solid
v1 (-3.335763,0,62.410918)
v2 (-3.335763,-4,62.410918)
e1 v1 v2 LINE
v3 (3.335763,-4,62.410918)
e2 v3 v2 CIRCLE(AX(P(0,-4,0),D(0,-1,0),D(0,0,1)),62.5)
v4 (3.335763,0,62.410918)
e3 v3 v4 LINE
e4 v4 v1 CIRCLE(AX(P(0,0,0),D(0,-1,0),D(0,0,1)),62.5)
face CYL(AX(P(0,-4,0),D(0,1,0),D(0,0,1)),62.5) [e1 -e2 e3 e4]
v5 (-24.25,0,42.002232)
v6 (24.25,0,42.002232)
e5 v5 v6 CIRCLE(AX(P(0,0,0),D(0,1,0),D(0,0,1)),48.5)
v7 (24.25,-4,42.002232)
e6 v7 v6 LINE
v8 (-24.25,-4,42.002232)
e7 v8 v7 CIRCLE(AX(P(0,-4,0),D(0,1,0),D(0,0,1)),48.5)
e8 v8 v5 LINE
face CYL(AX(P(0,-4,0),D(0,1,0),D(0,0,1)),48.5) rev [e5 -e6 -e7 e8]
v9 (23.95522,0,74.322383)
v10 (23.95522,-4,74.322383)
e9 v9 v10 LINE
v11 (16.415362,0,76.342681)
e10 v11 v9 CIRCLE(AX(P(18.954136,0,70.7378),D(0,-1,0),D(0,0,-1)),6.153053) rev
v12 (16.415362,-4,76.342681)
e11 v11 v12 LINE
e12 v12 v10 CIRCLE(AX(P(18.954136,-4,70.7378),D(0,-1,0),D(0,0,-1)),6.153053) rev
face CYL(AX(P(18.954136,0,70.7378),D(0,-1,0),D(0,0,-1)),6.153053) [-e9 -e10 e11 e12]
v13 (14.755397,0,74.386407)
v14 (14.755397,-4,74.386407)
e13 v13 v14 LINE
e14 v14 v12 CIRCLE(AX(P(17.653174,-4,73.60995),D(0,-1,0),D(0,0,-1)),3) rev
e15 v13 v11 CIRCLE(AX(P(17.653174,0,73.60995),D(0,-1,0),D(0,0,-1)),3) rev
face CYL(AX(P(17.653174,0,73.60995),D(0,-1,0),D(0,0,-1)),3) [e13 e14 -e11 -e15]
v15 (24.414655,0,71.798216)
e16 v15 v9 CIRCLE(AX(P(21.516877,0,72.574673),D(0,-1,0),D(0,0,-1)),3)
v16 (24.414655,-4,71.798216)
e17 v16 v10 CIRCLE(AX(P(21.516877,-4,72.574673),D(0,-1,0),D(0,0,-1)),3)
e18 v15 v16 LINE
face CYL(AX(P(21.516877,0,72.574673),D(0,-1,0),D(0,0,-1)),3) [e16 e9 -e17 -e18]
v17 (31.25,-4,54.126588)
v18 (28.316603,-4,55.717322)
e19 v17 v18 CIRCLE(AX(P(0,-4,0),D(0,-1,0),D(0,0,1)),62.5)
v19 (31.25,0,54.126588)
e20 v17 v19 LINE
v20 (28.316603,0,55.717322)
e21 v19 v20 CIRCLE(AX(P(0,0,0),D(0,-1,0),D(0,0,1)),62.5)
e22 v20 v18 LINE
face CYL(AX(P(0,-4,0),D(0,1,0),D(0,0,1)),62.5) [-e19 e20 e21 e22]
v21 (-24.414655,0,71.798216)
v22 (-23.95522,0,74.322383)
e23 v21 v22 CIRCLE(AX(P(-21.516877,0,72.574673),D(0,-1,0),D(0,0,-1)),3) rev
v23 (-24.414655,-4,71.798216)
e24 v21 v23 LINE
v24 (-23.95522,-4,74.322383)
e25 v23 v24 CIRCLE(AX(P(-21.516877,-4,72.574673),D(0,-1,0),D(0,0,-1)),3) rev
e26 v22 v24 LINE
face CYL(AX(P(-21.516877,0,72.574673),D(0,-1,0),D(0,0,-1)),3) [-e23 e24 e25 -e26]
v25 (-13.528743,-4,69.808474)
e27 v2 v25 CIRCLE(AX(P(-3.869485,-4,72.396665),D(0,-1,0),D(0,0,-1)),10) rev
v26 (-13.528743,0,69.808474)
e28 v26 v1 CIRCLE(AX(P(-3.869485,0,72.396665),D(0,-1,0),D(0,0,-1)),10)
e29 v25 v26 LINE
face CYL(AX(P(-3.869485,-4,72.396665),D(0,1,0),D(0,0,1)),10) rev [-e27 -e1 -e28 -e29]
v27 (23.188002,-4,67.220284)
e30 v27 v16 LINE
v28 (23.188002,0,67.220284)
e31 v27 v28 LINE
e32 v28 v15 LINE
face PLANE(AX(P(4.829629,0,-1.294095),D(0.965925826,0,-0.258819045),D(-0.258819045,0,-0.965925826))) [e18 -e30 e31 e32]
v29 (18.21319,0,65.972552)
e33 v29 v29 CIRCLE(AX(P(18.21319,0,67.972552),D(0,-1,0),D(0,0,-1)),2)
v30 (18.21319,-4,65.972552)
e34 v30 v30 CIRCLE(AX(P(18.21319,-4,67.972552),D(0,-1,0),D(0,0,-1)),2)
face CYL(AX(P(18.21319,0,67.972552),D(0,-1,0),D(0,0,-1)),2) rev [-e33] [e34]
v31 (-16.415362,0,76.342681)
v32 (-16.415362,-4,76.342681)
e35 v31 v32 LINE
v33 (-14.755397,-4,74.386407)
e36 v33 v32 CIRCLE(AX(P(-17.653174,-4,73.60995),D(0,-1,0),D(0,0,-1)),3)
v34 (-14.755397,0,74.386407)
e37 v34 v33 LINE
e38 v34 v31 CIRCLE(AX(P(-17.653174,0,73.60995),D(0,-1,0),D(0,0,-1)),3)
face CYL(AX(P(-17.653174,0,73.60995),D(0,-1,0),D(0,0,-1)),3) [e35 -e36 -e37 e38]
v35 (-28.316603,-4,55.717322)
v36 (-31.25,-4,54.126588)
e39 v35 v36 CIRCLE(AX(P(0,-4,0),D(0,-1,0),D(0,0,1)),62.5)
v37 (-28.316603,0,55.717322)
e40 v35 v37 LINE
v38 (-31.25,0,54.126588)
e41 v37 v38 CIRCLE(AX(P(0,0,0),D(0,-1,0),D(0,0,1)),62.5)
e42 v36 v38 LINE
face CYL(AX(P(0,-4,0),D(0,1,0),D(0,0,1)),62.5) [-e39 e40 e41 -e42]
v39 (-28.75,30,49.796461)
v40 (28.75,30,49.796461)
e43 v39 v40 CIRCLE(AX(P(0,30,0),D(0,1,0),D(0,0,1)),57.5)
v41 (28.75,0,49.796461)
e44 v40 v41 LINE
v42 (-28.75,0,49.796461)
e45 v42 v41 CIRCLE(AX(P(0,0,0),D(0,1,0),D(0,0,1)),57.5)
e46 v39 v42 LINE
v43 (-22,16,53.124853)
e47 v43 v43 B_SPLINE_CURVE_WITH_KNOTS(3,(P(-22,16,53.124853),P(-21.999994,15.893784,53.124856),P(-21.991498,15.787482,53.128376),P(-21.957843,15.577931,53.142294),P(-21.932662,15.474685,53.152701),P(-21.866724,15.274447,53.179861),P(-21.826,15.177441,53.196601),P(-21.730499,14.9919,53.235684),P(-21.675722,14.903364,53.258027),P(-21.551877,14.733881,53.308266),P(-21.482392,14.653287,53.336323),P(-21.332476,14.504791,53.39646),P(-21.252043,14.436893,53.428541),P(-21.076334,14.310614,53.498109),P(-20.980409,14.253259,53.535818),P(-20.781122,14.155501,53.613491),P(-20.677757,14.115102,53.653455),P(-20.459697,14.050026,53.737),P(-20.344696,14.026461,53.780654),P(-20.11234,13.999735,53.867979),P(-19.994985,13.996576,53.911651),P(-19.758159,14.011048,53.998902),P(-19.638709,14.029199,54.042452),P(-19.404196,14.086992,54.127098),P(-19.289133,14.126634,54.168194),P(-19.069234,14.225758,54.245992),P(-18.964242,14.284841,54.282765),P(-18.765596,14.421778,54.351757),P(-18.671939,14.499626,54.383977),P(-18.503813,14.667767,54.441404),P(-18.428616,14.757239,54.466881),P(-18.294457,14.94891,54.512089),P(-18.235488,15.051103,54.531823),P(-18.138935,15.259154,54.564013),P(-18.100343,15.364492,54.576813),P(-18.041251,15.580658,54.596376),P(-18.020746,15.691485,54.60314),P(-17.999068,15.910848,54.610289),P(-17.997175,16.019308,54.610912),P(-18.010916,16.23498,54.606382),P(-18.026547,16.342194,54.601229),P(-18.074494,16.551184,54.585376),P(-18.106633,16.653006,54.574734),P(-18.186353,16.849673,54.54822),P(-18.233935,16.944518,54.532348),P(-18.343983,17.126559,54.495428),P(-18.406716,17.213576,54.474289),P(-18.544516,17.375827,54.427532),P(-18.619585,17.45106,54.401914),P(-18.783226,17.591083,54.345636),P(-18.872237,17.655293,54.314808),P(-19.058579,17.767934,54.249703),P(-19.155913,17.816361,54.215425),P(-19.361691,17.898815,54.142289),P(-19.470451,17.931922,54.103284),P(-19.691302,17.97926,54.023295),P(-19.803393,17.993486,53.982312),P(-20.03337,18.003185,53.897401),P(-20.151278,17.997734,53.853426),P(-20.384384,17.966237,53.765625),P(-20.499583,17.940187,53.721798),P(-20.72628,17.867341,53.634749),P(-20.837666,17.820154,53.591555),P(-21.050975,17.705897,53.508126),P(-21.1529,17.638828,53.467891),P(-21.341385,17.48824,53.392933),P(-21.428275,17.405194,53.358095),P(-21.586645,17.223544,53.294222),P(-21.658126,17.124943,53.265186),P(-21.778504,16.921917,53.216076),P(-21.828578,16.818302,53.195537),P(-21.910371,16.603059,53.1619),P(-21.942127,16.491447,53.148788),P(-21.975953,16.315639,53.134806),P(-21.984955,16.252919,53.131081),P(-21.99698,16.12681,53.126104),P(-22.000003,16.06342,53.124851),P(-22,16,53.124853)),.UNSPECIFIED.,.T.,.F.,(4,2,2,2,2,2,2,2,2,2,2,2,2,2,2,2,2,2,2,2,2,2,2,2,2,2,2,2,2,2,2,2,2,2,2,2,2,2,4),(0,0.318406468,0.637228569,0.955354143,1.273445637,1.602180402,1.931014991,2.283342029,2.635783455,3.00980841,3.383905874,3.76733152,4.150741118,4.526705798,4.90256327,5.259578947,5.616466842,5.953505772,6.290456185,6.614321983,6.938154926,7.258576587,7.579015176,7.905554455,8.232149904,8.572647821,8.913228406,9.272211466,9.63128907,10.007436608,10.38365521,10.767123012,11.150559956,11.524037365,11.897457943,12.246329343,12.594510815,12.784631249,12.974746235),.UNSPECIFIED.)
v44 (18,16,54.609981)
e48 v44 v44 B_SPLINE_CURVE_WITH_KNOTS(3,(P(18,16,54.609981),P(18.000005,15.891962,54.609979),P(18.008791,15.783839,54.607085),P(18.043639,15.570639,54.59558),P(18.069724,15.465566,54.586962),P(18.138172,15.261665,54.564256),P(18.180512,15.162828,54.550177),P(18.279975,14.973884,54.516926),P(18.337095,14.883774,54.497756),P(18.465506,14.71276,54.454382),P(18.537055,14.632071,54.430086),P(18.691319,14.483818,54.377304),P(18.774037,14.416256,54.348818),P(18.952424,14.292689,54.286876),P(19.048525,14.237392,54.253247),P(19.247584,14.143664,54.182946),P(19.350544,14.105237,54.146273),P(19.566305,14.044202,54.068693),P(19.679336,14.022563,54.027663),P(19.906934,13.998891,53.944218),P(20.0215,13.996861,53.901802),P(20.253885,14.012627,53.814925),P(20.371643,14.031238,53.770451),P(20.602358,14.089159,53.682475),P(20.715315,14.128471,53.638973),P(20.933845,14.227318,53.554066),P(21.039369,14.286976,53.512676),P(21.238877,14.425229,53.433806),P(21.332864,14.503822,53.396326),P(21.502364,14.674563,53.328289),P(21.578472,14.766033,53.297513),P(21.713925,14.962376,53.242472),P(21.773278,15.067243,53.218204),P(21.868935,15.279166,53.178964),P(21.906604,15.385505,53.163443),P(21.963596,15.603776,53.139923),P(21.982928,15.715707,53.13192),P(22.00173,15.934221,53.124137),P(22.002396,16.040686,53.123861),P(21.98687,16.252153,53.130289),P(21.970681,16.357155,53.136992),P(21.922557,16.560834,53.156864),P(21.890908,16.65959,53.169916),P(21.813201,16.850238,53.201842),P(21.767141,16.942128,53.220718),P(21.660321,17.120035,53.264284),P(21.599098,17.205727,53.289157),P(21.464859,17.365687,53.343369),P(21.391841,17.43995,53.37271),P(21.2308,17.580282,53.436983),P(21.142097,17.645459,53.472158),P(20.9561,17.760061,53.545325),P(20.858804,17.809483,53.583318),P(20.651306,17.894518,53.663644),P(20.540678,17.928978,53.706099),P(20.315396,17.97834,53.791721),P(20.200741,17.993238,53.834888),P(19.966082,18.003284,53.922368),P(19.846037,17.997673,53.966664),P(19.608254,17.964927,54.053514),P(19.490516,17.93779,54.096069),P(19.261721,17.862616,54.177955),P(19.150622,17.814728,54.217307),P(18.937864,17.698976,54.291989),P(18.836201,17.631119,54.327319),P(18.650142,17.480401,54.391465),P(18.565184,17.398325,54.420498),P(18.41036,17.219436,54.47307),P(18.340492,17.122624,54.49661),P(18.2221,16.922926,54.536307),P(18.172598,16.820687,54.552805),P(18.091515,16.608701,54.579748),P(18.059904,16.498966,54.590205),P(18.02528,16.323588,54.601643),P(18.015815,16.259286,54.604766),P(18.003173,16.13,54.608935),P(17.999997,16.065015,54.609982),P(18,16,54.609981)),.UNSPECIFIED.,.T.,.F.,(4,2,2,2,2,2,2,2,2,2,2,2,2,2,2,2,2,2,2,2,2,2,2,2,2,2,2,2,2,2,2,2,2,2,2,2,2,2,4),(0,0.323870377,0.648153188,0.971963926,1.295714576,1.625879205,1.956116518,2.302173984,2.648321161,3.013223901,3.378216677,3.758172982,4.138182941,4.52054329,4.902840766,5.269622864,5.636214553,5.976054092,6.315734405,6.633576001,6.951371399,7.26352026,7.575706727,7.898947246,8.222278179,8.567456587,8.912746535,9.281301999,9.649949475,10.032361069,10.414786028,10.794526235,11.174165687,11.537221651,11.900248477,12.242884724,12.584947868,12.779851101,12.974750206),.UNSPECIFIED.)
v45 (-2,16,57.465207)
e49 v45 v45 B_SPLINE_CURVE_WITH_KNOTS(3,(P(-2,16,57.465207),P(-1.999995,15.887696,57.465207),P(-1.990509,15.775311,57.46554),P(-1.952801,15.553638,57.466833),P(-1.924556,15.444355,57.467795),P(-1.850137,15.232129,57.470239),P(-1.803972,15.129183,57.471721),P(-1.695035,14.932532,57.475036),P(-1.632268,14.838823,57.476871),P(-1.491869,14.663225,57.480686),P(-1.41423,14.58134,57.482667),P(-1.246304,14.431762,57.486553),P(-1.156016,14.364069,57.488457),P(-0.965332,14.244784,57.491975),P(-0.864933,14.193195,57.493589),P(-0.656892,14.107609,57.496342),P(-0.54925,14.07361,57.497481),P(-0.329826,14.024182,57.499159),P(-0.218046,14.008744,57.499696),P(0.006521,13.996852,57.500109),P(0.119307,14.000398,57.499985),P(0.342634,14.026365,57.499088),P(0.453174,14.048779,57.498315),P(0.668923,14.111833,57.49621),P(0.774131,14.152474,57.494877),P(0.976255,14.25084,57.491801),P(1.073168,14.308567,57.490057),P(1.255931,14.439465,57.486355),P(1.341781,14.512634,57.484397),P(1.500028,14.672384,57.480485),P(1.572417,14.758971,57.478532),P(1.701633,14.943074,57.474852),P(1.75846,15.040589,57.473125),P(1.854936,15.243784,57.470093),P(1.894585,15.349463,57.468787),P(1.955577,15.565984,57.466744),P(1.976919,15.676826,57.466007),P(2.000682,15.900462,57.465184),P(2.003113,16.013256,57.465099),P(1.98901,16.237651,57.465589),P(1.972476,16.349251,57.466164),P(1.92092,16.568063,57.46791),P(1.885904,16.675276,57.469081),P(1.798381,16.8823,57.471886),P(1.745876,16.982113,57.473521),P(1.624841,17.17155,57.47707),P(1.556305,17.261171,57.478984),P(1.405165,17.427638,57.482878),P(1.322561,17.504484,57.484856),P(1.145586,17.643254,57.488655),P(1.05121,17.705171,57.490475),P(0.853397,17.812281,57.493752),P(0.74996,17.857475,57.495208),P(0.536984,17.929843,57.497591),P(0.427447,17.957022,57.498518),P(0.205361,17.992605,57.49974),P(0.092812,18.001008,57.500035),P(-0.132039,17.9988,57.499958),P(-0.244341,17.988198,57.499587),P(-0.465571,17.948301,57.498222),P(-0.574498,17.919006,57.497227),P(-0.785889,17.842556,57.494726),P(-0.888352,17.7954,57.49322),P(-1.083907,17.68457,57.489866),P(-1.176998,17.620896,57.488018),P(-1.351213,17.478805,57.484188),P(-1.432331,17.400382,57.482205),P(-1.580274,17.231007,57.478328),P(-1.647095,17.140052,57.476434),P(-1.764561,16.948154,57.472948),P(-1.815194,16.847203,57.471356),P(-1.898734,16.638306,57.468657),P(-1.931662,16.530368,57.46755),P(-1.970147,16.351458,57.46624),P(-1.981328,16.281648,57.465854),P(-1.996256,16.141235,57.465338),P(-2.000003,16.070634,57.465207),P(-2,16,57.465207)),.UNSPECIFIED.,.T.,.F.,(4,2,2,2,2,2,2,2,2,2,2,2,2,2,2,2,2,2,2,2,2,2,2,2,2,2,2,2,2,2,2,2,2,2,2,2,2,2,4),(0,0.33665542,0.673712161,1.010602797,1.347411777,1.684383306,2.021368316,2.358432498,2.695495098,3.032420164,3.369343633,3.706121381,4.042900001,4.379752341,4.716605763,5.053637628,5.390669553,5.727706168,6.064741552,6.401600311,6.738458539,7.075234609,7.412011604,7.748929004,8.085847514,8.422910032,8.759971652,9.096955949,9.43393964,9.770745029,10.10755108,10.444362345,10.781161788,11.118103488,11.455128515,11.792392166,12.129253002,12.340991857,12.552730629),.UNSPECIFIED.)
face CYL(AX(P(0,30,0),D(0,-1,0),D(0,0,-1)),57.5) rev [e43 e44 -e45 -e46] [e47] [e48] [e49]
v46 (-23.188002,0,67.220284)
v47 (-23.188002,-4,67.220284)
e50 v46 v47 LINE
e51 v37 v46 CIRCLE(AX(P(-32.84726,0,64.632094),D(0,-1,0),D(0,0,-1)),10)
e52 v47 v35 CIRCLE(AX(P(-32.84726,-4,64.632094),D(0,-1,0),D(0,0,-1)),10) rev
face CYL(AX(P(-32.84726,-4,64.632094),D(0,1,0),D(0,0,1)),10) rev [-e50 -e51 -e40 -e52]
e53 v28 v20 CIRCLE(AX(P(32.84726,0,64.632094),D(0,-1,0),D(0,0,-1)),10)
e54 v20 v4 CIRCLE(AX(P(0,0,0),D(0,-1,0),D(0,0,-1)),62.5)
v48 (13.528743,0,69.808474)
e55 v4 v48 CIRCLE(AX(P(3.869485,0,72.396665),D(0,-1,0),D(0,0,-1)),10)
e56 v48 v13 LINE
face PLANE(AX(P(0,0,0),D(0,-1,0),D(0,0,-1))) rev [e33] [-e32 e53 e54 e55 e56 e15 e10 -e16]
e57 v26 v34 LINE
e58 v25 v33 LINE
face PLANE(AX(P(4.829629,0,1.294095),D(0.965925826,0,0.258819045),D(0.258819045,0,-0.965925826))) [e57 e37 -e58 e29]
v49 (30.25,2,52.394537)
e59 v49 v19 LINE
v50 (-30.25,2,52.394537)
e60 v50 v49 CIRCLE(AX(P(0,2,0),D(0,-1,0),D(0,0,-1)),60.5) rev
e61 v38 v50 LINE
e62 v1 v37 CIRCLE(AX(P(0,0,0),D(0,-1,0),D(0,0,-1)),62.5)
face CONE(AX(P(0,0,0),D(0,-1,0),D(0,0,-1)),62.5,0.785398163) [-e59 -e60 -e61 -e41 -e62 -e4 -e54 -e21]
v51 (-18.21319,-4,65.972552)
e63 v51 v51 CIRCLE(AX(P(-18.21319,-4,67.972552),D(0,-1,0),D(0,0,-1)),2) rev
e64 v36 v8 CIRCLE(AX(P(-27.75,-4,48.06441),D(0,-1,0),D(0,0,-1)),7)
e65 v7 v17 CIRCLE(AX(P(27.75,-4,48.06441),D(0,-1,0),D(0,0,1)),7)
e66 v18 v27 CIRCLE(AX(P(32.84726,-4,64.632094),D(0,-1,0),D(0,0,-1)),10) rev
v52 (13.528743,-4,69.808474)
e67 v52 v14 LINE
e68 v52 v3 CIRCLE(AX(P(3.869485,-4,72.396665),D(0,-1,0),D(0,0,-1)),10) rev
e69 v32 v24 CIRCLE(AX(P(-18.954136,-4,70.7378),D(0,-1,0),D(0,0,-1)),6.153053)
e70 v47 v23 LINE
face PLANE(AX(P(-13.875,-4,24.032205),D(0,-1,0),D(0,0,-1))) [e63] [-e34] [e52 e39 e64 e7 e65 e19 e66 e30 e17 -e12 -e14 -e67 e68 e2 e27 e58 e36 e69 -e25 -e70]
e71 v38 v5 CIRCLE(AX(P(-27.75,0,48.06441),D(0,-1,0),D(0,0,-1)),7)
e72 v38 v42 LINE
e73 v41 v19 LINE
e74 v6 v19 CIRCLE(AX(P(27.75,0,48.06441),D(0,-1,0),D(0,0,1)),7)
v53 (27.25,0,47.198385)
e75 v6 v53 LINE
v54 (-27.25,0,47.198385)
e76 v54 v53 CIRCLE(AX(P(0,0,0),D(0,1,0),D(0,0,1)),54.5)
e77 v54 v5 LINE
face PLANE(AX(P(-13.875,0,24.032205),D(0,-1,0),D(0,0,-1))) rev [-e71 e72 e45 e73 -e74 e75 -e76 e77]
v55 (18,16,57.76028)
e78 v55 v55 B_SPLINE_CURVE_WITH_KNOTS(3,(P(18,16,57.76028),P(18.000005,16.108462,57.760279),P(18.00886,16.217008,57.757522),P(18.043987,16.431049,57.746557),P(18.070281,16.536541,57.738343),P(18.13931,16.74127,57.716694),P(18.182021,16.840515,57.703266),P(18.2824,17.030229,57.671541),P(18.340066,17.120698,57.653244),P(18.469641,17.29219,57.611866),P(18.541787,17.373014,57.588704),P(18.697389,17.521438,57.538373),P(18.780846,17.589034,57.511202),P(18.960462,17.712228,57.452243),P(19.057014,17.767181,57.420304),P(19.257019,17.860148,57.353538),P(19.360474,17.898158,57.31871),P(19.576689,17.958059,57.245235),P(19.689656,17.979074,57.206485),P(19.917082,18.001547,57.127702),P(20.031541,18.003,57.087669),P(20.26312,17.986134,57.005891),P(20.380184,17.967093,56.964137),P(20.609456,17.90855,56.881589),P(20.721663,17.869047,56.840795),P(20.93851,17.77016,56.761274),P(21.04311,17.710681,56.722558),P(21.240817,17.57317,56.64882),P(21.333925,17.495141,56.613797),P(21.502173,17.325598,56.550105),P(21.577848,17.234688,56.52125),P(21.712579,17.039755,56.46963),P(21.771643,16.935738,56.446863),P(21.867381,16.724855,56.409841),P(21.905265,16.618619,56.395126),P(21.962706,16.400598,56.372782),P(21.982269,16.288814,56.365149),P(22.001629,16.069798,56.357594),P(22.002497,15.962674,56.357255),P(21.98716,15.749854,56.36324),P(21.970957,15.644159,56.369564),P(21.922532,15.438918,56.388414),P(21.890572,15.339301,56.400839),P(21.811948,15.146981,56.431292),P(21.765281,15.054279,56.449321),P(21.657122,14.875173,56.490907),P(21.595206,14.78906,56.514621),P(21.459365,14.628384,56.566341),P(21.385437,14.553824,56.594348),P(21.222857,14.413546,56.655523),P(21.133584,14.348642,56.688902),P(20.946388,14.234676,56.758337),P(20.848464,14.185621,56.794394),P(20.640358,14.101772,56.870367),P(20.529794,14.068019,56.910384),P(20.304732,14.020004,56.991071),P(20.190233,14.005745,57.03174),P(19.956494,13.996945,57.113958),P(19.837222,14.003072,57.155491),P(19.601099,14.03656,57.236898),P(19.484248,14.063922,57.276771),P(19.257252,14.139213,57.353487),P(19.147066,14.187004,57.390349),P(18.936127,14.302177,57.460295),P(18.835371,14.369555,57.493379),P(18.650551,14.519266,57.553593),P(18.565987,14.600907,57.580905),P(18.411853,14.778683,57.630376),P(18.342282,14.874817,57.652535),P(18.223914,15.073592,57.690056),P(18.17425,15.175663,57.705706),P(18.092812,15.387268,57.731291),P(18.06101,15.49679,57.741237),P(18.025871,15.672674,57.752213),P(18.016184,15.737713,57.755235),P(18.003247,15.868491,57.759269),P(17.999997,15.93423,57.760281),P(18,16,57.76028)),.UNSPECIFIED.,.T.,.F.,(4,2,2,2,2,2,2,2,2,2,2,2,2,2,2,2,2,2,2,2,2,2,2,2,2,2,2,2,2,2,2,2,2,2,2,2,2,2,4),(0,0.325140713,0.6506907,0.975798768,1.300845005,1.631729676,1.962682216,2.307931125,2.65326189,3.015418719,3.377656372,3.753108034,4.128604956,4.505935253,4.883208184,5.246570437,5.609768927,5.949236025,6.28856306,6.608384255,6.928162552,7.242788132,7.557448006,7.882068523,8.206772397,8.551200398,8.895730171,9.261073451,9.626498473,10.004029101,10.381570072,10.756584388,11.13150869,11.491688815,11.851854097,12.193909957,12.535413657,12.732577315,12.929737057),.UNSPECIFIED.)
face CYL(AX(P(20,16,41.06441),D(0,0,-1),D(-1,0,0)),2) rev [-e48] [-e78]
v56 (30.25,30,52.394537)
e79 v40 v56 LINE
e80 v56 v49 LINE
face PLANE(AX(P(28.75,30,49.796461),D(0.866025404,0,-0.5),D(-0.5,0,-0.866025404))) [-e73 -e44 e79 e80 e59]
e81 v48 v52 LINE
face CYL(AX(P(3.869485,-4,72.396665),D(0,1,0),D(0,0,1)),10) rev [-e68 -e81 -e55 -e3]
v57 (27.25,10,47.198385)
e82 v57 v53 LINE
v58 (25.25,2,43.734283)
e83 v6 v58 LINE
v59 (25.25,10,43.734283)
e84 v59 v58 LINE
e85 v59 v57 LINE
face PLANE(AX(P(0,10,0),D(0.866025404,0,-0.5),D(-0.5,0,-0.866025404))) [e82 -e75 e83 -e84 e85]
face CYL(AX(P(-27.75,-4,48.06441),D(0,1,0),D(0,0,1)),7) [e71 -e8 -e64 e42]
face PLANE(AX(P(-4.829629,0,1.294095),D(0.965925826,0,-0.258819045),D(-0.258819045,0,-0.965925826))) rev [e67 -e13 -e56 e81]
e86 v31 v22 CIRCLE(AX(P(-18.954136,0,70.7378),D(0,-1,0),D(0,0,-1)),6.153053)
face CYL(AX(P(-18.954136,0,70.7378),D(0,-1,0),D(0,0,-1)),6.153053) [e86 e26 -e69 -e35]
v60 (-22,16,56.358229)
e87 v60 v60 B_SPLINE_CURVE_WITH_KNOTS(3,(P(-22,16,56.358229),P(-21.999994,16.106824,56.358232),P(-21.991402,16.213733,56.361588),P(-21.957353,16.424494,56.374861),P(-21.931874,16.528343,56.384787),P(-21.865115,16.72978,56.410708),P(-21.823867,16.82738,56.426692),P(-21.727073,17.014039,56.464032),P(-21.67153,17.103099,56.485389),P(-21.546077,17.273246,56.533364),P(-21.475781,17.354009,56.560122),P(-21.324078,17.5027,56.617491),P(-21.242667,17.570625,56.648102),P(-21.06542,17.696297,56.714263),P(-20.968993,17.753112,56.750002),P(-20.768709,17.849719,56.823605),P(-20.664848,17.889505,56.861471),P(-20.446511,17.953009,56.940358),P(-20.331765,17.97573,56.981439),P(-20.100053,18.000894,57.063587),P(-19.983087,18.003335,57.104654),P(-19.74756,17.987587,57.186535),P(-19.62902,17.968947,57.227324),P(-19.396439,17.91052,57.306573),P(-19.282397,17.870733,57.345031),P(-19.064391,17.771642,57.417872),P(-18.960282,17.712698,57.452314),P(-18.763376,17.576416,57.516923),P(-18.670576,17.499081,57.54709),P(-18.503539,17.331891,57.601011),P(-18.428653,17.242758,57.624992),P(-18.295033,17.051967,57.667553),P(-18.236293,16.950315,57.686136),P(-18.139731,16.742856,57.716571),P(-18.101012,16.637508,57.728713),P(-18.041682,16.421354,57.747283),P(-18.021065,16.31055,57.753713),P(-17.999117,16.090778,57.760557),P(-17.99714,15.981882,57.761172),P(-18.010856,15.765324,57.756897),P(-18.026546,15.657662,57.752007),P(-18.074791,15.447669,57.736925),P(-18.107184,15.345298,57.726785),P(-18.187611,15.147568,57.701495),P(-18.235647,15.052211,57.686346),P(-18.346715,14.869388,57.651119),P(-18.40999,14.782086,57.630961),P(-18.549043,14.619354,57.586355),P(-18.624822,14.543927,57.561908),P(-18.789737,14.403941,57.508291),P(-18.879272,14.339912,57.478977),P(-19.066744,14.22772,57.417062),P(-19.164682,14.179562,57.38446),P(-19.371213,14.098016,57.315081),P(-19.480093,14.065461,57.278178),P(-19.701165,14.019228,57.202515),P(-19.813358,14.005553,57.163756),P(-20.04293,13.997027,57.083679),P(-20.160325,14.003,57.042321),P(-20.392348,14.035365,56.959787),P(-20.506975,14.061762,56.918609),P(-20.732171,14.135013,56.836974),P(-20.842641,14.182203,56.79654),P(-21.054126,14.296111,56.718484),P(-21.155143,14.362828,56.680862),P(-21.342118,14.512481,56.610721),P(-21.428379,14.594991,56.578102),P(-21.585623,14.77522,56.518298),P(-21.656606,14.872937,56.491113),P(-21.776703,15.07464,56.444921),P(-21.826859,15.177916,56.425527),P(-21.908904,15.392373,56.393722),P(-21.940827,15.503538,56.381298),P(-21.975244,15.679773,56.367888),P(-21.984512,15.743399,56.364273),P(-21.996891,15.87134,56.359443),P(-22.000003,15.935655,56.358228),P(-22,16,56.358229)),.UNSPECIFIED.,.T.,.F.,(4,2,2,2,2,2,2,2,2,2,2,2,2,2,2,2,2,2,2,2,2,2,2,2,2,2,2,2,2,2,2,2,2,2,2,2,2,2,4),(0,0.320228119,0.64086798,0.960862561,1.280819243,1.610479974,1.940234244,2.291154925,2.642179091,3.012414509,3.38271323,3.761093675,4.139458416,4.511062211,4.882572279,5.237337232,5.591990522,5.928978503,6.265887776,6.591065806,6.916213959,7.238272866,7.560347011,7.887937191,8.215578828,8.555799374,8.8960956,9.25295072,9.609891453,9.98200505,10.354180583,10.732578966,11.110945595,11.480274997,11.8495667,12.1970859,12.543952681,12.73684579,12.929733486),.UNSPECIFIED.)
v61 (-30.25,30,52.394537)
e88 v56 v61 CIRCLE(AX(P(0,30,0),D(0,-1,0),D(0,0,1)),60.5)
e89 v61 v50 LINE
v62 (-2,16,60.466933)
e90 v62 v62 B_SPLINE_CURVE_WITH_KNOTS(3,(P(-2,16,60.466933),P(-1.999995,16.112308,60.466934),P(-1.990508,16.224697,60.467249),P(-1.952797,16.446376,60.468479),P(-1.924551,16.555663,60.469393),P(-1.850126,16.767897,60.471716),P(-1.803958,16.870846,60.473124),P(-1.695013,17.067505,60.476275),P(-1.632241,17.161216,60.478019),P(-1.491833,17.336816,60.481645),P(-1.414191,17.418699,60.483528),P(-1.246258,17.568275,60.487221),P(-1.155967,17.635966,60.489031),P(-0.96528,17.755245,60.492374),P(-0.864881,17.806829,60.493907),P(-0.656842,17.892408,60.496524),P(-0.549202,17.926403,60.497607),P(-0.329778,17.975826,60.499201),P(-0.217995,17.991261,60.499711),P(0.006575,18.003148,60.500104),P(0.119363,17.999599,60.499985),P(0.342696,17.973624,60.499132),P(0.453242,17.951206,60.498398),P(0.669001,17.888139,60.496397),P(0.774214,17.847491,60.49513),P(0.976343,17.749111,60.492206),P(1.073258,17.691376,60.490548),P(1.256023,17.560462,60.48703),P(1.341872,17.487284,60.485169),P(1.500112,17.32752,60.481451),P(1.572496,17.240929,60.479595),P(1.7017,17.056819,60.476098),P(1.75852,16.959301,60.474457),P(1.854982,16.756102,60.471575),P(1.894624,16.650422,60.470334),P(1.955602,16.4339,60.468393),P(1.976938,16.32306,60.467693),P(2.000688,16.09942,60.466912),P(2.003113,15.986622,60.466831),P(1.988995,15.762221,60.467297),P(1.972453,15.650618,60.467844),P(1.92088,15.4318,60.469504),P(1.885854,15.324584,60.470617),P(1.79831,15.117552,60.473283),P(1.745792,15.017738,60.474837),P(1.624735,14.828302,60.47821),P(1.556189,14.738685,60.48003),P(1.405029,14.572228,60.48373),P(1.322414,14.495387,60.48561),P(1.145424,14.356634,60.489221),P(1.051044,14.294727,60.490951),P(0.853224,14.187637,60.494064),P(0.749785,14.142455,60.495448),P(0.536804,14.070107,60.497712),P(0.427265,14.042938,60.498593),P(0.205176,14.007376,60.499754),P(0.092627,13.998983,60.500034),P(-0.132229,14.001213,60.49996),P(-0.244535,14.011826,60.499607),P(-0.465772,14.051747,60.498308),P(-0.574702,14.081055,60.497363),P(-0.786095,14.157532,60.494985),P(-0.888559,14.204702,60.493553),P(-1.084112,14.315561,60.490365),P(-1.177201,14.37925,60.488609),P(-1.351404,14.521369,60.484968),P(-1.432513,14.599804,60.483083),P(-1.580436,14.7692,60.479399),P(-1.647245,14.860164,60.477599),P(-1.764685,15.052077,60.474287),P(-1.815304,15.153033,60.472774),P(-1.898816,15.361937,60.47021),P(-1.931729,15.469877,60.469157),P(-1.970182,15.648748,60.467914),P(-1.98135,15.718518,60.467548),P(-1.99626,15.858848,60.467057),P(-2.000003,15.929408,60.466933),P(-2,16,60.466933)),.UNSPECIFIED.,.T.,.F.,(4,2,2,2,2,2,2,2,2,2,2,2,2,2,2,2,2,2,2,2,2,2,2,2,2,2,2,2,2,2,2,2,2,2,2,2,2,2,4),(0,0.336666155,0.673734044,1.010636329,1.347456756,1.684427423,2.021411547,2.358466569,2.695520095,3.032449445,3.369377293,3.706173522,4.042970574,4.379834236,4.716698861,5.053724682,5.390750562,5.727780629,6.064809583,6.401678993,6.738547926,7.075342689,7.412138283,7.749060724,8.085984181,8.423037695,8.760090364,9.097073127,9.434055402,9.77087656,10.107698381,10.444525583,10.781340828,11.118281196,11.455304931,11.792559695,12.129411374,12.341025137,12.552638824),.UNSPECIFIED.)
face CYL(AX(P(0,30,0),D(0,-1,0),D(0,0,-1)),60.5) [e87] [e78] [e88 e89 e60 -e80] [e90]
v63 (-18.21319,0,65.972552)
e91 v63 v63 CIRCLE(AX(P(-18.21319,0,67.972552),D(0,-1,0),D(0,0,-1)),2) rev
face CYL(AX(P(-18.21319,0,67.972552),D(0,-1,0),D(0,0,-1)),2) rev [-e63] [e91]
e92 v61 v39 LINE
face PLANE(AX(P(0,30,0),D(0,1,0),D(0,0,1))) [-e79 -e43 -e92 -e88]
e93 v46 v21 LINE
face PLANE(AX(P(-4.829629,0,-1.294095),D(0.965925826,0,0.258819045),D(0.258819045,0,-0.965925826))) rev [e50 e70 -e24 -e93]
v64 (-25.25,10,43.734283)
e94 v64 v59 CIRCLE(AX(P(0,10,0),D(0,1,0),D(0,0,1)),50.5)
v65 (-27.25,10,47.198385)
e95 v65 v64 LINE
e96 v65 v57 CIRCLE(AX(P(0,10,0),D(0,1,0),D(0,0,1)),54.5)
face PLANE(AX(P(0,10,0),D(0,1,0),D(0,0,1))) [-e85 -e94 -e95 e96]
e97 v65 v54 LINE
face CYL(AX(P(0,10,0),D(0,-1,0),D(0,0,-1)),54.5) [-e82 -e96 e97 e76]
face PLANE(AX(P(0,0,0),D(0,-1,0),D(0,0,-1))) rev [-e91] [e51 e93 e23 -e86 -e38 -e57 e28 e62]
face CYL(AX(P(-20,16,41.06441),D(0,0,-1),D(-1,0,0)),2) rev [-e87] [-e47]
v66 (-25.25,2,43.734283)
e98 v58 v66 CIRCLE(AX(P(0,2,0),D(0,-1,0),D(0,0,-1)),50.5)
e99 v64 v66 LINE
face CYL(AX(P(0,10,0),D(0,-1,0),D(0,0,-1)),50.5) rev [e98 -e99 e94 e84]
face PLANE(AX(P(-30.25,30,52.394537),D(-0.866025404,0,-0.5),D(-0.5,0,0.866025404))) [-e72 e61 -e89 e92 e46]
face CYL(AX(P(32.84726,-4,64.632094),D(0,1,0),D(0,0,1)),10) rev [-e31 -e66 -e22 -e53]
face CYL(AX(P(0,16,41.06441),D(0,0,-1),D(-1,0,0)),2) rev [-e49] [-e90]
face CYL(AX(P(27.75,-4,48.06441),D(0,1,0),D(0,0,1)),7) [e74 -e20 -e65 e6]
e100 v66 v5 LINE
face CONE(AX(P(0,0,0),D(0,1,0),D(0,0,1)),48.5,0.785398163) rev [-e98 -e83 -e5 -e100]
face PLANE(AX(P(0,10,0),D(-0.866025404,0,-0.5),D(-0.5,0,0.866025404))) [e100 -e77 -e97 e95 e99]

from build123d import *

# Parameters (mm, degrees)
BOSS_EXTRUDE1_DEPTH     = 10
BOSS_EXTRUDE2_DEPTH     = 30
BOSS_EXTRUDE3_DEPTH     = 4
CHAMFER1_SIZE           = 2
CUT_EXTRUDE1_DEPTH      = 78.548774974
CUT_EXTRUDE1_DEPTH_BACK = 78.548774974
SKETCH5_R               = 2
BOSS_EXTRUDE4_START     = -4
SKETCH6_R               = 2
BOSS_EXTRUDE4_DEPTH     = 4
FILLET1_R               = 10


with BuildPart() as part:
    # Sketch1 → Boss-Extrude1 (new body)
    with BuildSketch(Plane(origin=(0, 0, 0), x_dir=(1, 0, 0), z_dir=(0, 1, 0))):
        with BuildLine():
            ThreePointArc((-25.25, -43.734282891), (0, -50.5), (25.25, -43.734282891))
            Line((25.25, -43.734282891), (27.25, -47.198384506))
            ThreePointArc((27.25, -47.198384506), (0, -54.5), (-27.25, -47.198384506))
            Line((-27.25, -47.198384506), (-25.25, -43.734282891))
        make_face()
    extrude(amount=BOSS_EXTRUDE1_DEPTH)



with BuildPart() as body_2:
    # Sketch3 → Boss-Extrude2 (new body)
    with BuildSketch(Plane.XZ):
        with BuildLine():
            Line((-30.25, 52.394536929), (-28.75, 49.796460718))
            ThreePointArc((-28.75, 49.796460718), (0, 57.5), (28.75, 49.796460718))
            Line((28.75, 49.796460718), (30.25, 52.394536929))
            ThreePointArc((30.25, 52.394536929), (0, 60.5), (-30.25, 52.394536929))
        make_face()
    extrude(amount=-BOSS_EXTRUDE2_DEPTH)


with BuildPart() as part_1:
    add(part.part)

    add(body_2.part)  # Boss-Extrude3 merges body 2
    # Sketch4 → Boss-Extrude3 (add)
    with BuildSketch(Plane.XZ):
        with BuildLine():
            ThreePointArc((-24.25, 42.002232084), (0, 48.5), (24.25, 42.002232084))
            ThreePointArc((24.25, 42.002232084), (33.812177826, 44.56440991), (31.25, 54.126587737))
            ThreePointArc((31.25, 54.126587737), (0, 62.5), (-31.25, 54.126587737))
            ThreePointArc((-31.25, 54.126587737), (-33.812177826, 44.56440991), (-24.25, 42.002232084))
        make_face()
    extrude(amount=BOSS_EXTRUDE3_DEPTH)

    # Chamfer1
    chamfer1_edges = [part_1.edges().sort_by_distance(p)[0] for p in [
        (0, 0, 60.5),
        (0, 0, 50.5),
    ]]
    chamfer(chamfer1_edges, length=CHAMFER1_SIZE - 0.0001)  # a hair under: the kernel refuses the full size

    # Sketch5 → Cut-Extrude1 (cut, two sides: drawn at the far end of the back side and taken through both)
    with BuildSketch(Plane.XY.offset(-CUT_EXTRUDE1_DEPTH_BACK)):
        with Locations(Location((0, 16, 0), (0, 0, 180))):
            Circle(SKETCH5_R)
        with Locations(Location((-20, 16, 0), (0, 0, 180))):
            Circle(SKETCH5_R)
        with Locations(Location((20, 16, 0), (0, 0, 180))):
            Circle(SKETCH5_R)
    extrude(amount=CUT_EXTRUDE1_DEPTH + CUT_EXTRUDE1_DEPTH_BACK, mode=Mode.SUBTRACT)

    # Sketch6 → Boss-Extrude4 (add)
    # profile 1 of 2: a face of its own
    with BuildSketch(Plane.XZ.offset(4).offset(BOSS_EXTRUDE4_START)):
        with BuildLine():
            Line((20.953972553, 58.882773663), (24.414654978, 71.798216302))
            ThreePointArc((24.414654978, 71.798216302), (24.468385119, 73.111891055), (23.955219754, 74.322382523))
            ThreePointArc((23.955219754, 74.322382523), (20.546663808, 76.681193258), (16.415362401, 76.342681212))
            ThreePointArc((16.415362401, 76.342681212), (15.365702425, 75.550947532), (14.755396715, 74.386406753))
            Line((14.755396715, 74.386406753), (11.29471429, 61.470964114))
            ThreePointArc((11.29471429, 61.470964114), (16.176190319, 60.370364143), (20.953972553, 58.882773663))
        make_face()
        with Locations(Location((18.213190451, 67.972552131, 0), (0, 0, 270))):
            Circle(SKETCH6_R, mode=Mode.SUBTRACT)
    # profile 2 of 2: a face of its own
    with BuildSketch(Plane.XZ.offset(4).offset(BOSS_EXTRUDE4_START)):
        with BuildLine():
            Line((-20.953972553, 58.882773663), (-24.414654978, 71.798216302))
            ThreePointArc((-24.414654978, 71.798216302), (-24.468385119, 73.111891055), (-23.955219754, 74.322382523))
            ThreePointArc((-23.955219754, 74.322382523), (-20.546663808, 76.681193258), (-16.415362401, 76.342681212))
            ThreePointArc((-16.415362401, 76.342681212), (-15.365702425, 75.550947532), (-14.755396715, 74.386406753))
            Line((-14.755396715, 74.386406753), (-11.29471429, 61.470964114))
            ThreePointArc((-11.29471429, 61.470964114), (-16.176190319, 60.370364143), (-20.953972553, 58.882773663))
        make_face()
        with Locations(Location((-18.213190451, 67.972552131, 0), (0, 0, 270))):
            Circle(SKETCH6_R, mode=Mode.SUBTRACT)
    extrude(amount=BOSS_EXTRUDE4_DEPTH)

    # Fillet1
    fillet1_edges = [part_1.edges().sort_by_distance(p)[0] for p in [
        (-11.29471429, -2, 61.470964114),
        (-20.953972553, -2, 58.882773663),
        (20.953972553, -2, 58.882773663),
        (11.29471429, -2, 61.470964114),
    ]]
    fillet(fillet1_edges, radius=FILLET1_R)


solid = part_1.part
